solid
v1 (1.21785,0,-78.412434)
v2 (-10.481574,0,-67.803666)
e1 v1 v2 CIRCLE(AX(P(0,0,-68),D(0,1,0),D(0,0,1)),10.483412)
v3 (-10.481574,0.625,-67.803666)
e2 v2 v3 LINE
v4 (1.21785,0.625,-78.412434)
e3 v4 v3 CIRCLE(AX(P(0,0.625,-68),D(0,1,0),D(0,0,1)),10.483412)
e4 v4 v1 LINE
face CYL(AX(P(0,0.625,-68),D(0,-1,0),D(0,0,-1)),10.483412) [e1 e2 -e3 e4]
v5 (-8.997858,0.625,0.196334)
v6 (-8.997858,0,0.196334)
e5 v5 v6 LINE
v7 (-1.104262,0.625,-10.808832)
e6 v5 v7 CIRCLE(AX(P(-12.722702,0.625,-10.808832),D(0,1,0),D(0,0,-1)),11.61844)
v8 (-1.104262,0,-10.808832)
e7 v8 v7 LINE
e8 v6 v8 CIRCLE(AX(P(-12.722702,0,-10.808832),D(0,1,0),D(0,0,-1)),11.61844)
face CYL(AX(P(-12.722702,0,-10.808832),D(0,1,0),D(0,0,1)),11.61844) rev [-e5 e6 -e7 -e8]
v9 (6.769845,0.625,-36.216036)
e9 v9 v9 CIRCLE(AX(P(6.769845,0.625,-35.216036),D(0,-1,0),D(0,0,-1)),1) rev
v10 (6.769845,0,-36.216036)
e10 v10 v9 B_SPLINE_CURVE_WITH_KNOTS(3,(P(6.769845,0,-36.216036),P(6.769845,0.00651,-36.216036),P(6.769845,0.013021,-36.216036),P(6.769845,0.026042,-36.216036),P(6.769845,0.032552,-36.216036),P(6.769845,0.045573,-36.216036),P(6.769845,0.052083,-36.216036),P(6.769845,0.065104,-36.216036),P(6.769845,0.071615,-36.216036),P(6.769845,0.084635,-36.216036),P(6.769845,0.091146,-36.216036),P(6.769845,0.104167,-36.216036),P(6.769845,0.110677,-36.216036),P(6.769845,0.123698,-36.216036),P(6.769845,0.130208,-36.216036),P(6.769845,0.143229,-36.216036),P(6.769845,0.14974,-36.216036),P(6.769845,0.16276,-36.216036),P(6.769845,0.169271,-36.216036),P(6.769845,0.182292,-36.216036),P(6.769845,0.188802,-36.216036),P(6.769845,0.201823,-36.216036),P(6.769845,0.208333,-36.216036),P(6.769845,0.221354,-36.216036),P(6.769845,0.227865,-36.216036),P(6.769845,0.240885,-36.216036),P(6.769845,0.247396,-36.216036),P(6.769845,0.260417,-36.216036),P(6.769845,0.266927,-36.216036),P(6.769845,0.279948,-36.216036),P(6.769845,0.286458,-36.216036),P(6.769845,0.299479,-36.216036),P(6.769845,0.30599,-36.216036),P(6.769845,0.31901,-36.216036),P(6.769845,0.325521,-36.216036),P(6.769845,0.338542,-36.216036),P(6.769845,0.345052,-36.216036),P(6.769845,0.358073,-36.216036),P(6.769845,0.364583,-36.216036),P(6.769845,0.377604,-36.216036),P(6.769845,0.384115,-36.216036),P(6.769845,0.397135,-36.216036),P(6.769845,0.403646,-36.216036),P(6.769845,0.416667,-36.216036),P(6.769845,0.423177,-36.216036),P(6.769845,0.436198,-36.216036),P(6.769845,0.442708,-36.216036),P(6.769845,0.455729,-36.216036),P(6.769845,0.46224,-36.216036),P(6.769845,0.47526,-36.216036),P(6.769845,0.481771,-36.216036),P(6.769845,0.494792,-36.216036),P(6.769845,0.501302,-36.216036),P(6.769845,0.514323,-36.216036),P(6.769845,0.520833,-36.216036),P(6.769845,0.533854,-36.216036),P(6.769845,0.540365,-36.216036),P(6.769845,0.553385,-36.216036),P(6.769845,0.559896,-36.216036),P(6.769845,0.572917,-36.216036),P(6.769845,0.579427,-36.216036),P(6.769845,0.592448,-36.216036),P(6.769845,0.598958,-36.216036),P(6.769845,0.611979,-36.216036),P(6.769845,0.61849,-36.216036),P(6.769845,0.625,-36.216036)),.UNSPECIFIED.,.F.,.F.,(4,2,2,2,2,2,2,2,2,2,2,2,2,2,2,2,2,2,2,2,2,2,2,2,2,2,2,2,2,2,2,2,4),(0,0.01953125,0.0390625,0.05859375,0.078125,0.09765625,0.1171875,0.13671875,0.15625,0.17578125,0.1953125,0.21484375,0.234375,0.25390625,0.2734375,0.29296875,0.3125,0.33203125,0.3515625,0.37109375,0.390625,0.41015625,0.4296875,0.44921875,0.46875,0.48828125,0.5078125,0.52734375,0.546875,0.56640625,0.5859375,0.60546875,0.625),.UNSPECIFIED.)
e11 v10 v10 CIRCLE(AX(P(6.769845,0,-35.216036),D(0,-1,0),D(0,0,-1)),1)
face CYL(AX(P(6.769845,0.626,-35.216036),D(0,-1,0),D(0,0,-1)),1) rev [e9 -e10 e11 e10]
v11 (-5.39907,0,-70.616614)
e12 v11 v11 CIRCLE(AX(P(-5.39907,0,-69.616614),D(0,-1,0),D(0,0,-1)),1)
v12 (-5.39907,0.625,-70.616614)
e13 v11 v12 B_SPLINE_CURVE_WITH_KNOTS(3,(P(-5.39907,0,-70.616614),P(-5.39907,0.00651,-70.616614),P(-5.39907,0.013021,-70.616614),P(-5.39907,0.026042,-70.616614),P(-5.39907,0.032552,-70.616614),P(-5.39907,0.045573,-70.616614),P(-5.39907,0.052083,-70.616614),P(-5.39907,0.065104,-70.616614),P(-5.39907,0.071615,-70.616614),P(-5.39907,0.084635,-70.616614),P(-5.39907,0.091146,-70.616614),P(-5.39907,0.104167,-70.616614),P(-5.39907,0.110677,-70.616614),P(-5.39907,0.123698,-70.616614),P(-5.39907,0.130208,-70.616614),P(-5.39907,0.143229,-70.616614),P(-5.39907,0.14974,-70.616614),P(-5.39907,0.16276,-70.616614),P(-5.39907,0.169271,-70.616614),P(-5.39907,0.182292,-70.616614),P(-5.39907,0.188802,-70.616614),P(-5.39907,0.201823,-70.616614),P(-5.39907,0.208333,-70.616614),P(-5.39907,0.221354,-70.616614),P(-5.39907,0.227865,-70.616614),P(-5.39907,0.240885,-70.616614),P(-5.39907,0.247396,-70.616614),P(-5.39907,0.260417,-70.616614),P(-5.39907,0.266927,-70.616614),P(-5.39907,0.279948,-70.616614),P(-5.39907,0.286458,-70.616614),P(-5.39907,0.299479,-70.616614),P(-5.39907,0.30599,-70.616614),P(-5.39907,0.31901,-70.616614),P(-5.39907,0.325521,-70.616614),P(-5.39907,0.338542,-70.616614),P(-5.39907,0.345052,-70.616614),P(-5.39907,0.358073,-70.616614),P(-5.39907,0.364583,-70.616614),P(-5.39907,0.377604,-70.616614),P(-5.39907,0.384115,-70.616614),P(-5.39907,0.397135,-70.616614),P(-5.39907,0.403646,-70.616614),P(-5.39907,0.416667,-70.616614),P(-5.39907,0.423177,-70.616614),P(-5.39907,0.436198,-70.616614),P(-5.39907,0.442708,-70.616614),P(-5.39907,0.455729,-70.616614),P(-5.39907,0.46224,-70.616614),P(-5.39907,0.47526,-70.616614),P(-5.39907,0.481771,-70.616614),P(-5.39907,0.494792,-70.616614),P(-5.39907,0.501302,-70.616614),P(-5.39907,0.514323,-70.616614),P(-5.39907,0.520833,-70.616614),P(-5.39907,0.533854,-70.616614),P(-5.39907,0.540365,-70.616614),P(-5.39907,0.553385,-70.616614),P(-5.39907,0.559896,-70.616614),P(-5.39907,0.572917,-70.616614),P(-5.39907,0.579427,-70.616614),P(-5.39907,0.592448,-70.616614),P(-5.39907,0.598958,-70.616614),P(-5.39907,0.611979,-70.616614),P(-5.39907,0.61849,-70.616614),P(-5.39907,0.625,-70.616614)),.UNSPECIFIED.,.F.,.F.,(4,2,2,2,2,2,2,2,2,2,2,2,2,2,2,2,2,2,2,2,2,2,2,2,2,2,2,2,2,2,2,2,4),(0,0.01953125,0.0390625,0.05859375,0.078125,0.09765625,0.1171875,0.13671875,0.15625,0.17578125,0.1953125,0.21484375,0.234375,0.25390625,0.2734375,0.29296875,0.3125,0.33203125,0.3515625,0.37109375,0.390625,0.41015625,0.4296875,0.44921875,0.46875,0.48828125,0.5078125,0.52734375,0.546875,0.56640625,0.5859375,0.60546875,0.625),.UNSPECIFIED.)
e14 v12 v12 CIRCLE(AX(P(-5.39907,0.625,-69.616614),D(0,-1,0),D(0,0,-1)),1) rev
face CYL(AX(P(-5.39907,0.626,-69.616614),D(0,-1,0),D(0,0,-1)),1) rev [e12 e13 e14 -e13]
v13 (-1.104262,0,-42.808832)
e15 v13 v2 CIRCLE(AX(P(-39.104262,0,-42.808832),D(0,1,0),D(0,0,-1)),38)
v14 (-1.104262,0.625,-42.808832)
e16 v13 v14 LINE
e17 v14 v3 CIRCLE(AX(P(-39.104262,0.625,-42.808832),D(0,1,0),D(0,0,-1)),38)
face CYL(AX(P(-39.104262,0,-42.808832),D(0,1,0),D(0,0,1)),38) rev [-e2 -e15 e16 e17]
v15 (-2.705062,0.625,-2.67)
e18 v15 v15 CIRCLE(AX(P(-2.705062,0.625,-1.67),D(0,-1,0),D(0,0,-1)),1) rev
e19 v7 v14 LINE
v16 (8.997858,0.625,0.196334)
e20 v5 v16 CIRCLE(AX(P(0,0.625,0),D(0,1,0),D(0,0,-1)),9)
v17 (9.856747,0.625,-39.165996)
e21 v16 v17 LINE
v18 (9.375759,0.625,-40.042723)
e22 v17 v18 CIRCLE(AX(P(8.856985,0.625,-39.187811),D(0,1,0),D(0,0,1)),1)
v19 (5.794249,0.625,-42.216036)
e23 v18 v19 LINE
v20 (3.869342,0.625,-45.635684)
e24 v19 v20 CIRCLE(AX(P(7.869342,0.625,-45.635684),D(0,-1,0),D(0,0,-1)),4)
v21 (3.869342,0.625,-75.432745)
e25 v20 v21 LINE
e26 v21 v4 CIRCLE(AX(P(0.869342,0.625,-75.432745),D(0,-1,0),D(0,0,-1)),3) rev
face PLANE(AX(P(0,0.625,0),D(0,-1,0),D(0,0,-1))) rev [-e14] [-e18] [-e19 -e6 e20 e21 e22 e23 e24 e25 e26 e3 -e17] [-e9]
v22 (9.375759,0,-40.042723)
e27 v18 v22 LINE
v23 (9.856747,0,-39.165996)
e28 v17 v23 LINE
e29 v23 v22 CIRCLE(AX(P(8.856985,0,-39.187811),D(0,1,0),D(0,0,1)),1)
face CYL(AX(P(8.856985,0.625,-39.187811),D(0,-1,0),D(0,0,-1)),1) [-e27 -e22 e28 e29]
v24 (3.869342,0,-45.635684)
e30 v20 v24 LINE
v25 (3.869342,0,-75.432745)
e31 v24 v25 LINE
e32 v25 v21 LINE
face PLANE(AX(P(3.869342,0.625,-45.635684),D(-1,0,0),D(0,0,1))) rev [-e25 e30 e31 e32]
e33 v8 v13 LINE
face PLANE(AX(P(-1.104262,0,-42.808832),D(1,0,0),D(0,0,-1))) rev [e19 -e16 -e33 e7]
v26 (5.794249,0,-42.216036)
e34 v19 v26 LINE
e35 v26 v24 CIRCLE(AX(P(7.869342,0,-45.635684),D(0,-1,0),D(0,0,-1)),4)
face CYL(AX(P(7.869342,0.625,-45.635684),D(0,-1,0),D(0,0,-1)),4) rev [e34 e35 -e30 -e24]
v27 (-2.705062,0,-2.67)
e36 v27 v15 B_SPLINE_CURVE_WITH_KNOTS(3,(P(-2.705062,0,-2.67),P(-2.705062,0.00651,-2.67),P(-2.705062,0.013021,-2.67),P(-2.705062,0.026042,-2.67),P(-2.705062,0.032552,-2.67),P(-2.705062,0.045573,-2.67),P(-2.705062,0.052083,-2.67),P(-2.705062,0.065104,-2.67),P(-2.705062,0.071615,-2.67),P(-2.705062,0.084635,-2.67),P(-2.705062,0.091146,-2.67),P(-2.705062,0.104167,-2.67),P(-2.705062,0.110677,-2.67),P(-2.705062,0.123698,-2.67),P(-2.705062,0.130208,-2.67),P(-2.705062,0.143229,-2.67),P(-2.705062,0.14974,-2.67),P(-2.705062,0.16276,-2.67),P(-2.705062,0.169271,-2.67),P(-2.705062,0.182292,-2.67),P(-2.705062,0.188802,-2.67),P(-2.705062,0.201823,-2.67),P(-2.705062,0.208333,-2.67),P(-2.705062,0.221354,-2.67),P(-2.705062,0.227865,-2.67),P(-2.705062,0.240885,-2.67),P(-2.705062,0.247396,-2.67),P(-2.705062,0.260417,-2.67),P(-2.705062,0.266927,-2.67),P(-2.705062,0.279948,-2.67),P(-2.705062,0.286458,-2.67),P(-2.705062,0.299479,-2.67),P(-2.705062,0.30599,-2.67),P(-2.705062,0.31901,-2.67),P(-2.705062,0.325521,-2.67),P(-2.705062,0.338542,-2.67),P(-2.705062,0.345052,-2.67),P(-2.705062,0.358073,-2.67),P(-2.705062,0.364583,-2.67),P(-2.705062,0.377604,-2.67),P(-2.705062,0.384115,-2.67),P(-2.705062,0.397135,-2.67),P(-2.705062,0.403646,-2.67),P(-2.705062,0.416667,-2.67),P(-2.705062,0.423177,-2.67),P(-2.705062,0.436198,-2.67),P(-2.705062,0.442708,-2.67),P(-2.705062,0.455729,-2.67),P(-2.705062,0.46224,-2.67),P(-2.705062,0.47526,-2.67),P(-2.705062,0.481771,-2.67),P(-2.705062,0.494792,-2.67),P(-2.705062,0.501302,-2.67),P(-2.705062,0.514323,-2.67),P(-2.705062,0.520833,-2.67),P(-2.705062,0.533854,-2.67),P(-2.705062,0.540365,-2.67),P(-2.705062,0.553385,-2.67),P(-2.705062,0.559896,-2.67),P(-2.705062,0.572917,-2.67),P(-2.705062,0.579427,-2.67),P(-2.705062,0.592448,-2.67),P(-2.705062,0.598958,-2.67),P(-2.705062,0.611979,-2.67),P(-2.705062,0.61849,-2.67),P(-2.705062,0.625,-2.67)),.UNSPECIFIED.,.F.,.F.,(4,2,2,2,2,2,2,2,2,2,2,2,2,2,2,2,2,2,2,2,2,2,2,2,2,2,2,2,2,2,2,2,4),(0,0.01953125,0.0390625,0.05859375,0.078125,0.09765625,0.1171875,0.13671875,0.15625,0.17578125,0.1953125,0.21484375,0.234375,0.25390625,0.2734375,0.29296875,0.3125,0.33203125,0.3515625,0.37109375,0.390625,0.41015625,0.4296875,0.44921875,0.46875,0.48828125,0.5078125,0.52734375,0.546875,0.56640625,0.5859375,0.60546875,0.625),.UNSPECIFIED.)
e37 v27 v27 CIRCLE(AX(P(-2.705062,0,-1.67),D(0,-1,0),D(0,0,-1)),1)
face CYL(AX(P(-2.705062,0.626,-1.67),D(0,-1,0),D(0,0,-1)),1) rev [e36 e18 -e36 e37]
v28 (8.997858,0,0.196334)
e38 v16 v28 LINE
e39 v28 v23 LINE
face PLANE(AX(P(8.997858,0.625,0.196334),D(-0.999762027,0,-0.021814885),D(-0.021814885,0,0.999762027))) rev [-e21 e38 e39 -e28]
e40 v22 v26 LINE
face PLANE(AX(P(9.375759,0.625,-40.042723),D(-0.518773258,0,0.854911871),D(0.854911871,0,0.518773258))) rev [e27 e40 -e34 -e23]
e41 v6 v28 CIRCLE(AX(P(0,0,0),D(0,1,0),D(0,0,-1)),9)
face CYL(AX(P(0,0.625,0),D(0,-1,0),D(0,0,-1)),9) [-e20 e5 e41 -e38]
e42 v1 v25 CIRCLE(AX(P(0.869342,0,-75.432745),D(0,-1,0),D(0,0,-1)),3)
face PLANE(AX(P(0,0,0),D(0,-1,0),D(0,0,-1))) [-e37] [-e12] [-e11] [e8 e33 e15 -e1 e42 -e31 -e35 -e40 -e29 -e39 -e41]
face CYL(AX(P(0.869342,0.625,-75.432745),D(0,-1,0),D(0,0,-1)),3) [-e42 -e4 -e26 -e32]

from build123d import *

# Parameters (mm, degrees)
BOSS_EXTRUDE1_DEPTH = 0.625
CUT_EXTRUDE3_DEPTH  = 0.625
FILLET1_START       = -1
FILLET1_DEPTH       = 3
CUT_EXTRUDE4_REACH  = 81.183
SKETCH5_R           = 1


with BuildPart() as part:
    # Sketch2 → Boss-Extrude1 (new body)
    with BuildSketch(Plane(origin=(0, 0, 0), x_dir=(1, 0, 0), z_dir=(0, 1, 0))):
        with BuildLine():
            Line((8.997858244, -0.196333965), (9.856747342, 39.165996151))
            ThreePointArc((9.856747342, 39.165996151), (9.733712071, 39.668799805), (9.375758573, 40.042722907))
            Line((9.375758573, 40.042722907), (5.794249139, 42.216036183))
            ThreePointArc((5.794249139, 42.216036183), (4.383630471, 43.673589393), (3.869342172, 45.635683666))
            Line((3.869342172, 45.635683666), (3.869342172, 77.038914875))
            ThreePointArc((3.869342172, 77.038914875), (3.676362717, 77.629438236), (3.171906493, 77.992043844))
            ThreePointArc((3.171906493, 77.992043844), (-6.282617519, 76.39229695), (-10.480917414, 67.771305568))
            Line((-10.480917414, 67.771305568), (-8.997858244, -0.196333965))
            ThreePointArc((-8.997858244, -0.196333965), (0, -9), (8.997858244, -0.196333965))
        make_face()
    extrude(amount=BOSS_EXTRUDE1_DEPTH)

    # Sketch3 → Cut-Extrude3 (cut)
    with BuildSketch(Plane(origin=(0, 0.625, 0), x_dir=(1, 0, 0), z_dir=(0, 1, 0))):
        with BuildLine():
            Line((-8.997858244, -0.196333965), (-10.481573544, 67.803666035))
            ThreePointArc((-10.481573544, 67.803666035), (-3.525742077, 56.156825546), (-1.104262014, 42.808832473))
            Line((-1.104262014, 42.808832473), (-1.104262014, 10.808832473))
            ThreePointArc((-1.104262014, 10.808832473), (-3.281700426, 4.037153402), (-8.997858244, -0.196333965))
        make_face()
    extrude(amount=-CUT_EXTRUDE3_DEPTH, mode=Mode.SUBTRACT)


with BuildPart() as body_2:
    # of the pieces the cut leaves, the one that is kept (cut_extrude3_keep)
    add(part.part.solids().sort_by_distance((8.997858244, 0, 0.196333965))[0])

    # Fillet1: read off the stored shape, not the designer's step
    # Fillet1 outline → Fillet1 (cut)
    with BuildSketch(Plane(origin=(0, 0, 0), x_dir=(1, 0, 0), z_dir=(0, 1, 0)).offset(FILLET1_START)):
        with BuildLine():
            ThreePointArc((3.171906493, 77.992043844), (2.204919962, 78.248915013), (1.217849838, 78.412433565))
            ThreePointArc((1.217849838, 78.412433565), (3.110493996, 77.427046766), (3.869342172, 75.432745259))
            Line((3.869342172, 75.432745259), (3.869342172, 77.038914875))
            ThreePointArc((3.869342172, 77.038914875), (3.676362717, 77.629438236), (3.171906493, 77.992043844))
        make_face()
    extrude(amount=FILLET1_DEPTH, mode=Mode.SUBTRACT)

    # Sketch5 → Cut-Extrude4 (cut, up to next)
    with BuildSketch(Plane.XZ, mode=Mode.PRIVATE) as cut_extrude4_sk1:
        with Locations(Location((-5.399070001, -69.616613762, 0), (0, 0, 270))):
            Circle(SKETCH5_R)
    cut_extrude4_tool1 = extrude(cut_extrude4_sk1.sketch, amount=-CUT_EXTRUDE4_REACH, mode=Mode.PRIVATE) & body_2.part
    # Sketch5 → Cut-Extrude4 (cut, up to next)
    with BuildSketch(Plane.XZ, mode=Mode.PRIVATE) as cut_extrude4_sk2:
        with Locations(Location((6.76984482, -35.216036183, 0), (0, 0, 270))):
            Circle(SKETCH5_R)
    cut_extrude4_tool2 = extrude(cut_extrude4_sk2.sketch, amount=-CUT_EXTRUDE4_REACH, mode=Mode.PRIVATE) & body_2.part
    # Sketch5 → Cut-Extrude4 (cut, up to next)
    with BuildSketch(Plane.XZ, mode=Mode.PRIVATE) as cut_extrude4_sk3:
        with Locations(Location((-2.705062156, -1.67, 0), (0, 0, 270))):
            Circle(SKETCH5_R)
    cut_extrude4_tool3 = extrude(cut_extrude4_sk3.sketch, amount=-CUT_EXTRUDE4_REACH, mode=Mode.PRIVATE) & body_2.part
    add(cut_extrude4_tool1.solids().sort_by_distance((-5.39907, 0, -69.616614))[0], mode=Mode.SUBTRACT)
    add(cut_extrude4_tool2.solids().sort_by_distance((6.769845, 0, -35.216036))[0], mode=Mode.SUBTRACT)
    add(cut_extrude4_tool3.solids().sort_by_distance((-2.705062, 0, -1.67))[0], mode=Mode.SUBTRACT)


solid = body_2.part
